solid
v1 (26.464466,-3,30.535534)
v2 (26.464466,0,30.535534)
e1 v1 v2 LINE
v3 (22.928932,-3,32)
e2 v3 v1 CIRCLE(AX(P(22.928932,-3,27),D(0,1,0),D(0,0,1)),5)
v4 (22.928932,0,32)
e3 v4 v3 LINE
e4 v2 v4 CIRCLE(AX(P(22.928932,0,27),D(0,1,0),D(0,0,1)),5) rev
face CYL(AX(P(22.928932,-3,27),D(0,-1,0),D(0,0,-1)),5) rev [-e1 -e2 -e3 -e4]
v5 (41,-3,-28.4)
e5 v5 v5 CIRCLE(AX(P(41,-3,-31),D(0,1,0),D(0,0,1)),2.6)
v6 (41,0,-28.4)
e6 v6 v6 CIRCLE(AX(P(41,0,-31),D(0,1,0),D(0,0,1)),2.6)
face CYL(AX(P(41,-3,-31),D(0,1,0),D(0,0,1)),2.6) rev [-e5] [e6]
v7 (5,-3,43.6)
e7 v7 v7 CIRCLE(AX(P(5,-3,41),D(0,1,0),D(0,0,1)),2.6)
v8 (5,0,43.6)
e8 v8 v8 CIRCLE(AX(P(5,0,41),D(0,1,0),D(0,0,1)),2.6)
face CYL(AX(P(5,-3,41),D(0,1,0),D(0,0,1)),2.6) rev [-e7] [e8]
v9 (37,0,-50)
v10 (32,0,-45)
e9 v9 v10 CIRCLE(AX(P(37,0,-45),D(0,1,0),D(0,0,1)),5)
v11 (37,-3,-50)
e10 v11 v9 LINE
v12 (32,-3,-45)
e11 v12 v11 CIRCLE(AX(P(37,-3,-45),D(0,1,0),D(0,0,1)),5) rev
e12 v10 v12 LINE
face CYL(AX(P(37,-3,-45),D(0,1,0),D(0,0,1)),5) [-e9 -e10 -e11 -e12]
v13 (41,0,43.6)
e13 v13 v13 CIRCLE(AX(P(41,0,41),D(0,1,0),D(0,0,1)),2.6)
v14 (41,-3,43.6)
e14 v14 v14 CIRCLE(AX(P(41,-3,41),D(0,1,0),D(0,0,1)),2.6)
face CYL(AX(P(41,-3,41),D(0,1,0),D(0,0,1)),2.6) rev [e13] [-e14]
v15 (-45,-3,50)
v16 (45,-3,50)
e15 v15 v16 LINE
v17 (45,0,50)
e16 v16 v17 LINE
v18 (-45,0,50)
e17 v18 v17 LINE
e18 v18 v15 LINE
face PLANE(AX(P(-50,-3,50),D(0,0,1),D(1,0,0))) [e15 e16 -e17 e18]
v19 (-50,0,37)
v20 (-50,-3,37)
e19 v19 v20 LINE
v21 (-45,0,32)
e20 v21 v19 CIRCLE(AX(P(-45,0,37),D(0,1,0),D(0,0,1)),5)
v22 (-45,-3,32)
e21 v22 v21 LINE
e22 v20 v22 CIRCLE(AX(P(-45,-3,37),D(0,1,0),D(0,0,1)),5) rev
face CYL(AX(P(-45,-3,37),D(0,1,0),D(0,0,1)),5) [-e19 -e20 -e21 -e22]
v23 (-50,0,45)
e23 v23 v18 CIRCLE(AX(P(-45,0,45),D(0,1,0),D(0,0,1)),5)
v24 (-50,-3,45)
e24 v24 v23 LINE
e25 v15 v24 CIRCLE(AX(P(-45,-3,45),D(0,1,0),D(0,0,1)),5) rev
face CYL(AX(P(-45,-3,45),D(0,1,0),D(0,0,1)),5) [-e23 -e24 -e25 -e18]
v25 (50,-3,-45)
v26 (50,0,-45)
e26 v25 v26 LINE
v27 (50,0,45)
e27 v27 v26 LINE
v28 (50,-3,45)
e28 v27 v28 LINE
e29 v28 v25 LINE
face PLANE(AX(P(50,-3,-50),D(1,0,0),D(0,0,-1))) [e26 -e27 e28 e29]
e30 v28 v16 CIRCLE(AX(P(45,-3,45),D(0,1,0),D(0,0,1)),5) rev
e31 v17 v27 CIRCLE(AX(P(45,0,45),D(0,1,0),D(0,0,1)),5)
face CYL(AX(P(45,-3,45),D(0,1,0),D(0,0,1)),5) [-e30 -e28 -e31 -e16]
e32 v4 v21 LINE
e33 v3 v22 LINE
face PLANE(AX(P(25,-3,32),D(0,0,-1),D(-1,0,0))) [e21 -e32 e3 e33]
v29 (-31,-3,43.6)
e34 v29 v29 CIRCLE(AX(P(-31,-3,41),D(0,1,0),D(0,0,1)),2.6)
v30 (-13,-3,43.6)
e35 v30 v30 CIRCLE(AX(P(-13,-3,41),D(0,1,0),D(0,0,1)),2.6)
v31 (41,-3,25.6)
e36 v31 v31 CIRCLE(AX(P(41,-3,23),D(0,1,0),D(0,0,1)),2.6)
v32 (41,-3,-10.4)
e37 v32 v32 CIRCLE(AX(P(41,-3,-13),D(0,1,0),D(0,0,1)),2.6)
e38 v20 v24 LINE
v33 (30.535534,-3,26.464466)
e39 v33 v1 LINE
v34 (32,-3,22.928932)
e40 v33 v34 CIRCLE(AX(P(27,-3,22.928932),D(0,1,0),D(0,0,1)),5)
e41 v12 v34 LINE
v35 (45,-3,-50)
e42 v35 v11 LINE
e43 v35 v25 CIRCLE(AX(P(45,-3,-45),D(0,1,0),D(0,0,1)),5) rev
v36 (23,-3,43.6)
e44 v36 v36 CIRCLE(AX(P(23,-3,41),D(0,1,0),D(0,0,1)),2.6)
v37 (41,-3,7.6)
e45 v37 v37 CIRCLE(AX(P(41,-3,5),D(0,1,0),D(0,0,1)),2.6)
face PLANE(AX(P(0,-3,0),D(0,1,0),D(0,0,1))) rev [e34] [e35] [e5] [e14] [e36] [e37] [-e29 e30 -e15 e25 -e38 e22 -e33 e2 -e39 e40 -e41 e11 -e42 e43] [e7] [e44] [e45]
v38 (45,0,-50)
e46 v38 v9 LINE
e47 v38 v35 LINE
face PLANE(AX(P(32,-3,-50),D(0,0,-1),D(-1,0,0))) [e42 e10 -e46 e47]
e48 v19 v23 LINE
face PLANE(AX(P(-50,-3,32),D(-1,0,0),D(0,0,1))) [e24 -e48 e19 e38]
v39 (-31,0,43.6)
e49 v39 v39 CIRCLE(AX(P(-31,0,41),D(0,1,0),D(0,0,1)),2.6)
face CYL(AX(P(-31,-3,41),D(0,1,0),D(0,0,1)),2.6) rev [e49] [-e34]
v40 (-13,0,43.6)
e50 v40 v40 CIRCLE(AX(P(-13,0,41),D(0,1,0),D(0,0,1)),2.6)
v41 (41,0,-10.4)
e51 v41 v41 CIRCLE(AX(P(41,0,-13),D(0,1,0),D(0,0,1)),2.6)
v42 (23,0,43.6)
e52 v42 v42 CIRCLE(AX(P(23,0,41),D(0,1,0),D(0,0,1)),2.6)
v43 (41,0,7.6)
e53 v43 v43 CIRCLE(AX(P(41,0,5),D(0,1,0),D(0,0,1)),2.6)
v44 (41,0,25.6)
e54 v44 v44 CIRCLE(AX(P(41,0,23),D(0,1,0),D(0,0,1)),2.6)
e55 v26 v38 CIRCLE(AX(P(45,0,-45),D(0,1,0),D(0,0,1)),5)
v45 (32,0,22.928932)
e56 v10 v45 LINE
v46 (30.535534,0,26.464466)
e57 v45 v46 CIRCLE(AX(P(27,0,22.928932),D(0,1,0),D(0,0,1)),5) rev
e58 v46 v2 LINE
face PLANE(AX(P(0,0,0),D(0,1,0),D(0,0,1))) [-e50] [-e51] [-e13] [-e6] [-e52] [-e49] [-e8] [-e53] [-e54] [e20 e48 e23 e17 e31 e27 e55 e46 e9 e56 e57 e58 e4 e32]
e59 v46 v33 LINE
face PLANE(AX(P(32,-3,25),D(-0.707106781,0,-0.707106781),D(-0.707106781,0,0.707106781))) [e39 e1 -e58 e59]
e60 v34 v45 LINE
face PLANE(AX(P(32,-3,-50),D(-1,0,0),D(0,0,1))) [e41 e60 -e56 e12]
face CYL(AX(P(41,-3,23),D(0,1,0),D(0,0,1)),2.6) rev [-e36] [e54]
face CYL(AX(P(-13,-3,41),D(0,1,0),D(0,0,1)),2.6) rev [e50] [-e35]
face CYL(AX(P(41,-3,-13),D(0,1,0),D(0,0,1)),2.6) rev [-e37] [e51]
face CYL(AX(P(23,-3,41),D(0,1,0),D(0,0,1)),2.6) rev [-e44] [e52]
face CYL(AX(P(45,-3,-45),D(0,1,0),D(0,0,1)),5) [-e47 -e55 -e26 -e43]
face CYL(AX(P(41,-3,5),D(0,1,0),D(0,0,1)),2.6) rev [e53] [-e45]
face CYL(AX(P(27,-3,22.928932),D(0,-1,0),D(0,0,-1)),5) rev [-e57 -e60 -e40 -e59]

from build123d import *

# Parameters (mm, degrees)
SKETCH1_R          = 2.6
BASE_FLANGE1_DEPTH = 3
FILLET1_R          = 5
FILLET2_R          = 5


# Sheet-metal steps are written as plain solids
with BuildPart() as part:
    # Sketch1 → Base-Flange1 (new body)
    with BuildSketch(Plane(origin=(0, 0, 0), x_dir=(1, 0, 0), z_dir=(0, 1, 0))):
        Polygon((32, 50), (50, 50), (50, -50), (-50, -50), (-50, -32), (25, -32), (32, -25), align=None)
        with Locations(Location((41, -41, 0), (0, 0, 270))):
            Circle(SKETCH1_R, mode=Mode.SUBTRACT)
        with Locations(Location((23, -41, 0), (0, 0, 270))):
            Circle(SKETCH1_R, mode=Mode.SUBTRACT)
        with Locations(Location((5, -41, 0), (0, 0, 270))):
            Circle(SKETCH1_R, mode=Mode.SUBTRACT)
        with Locations(Location((-13, -41, 0), (0, 0, 270))):
            Circle(SKETCH1_R, mode=Mode.SUBTRACT)
        with Locations(Location((-31, -41, 0), (0, 0, 270))):
            Circle(SKETCH1_R, mode=Mode.SUBTRACT)
        with Locations(Location((41, -23, 0), (0, 0, 270))):
            Circle(SKETCH1_R, mode=Mode.SUBTRACT)
        with Locations(Location((41, -5, 0), (0, 0, 270))):
            Circle(SKETCH1_R, mode=Mode.SUBTRACT)
        with Locations(Location((41, 13, 0), (0, 0, 270))):
            Circle(SKETCH1_R, mode=Mode.SUBTRACT)
        with Locations(Location((41, 31, 0), (0, 0, 270))):
            Circle(SKETCH1_R, mode=Mode.SUBTRACT)
    extrude(amount=-BASE_FLANGE1_DEPTH)

    # Fillet1
    fillet1_edges = [part.edges().sort_by_distance(p)[0] for p in [
        (25, -1.5, 32),
        (32, -1.5, 25),
    ]]
    fillet(fillet1_edges, radius=FILLET1_R)

    # Fillet2
    fillet2_edges = [part.edges().sort_by_distance(p)[0] for p in [
        (50, -1.5, 50),
        (-50, -1.5, 50),
        (-50, -1.5, 32),
        (32, -1.5, -50),
        (50, -1.5, -50),
    ]]
    fillet(fillet2_edges, radius=FILLET2_R)


solid = part.part
